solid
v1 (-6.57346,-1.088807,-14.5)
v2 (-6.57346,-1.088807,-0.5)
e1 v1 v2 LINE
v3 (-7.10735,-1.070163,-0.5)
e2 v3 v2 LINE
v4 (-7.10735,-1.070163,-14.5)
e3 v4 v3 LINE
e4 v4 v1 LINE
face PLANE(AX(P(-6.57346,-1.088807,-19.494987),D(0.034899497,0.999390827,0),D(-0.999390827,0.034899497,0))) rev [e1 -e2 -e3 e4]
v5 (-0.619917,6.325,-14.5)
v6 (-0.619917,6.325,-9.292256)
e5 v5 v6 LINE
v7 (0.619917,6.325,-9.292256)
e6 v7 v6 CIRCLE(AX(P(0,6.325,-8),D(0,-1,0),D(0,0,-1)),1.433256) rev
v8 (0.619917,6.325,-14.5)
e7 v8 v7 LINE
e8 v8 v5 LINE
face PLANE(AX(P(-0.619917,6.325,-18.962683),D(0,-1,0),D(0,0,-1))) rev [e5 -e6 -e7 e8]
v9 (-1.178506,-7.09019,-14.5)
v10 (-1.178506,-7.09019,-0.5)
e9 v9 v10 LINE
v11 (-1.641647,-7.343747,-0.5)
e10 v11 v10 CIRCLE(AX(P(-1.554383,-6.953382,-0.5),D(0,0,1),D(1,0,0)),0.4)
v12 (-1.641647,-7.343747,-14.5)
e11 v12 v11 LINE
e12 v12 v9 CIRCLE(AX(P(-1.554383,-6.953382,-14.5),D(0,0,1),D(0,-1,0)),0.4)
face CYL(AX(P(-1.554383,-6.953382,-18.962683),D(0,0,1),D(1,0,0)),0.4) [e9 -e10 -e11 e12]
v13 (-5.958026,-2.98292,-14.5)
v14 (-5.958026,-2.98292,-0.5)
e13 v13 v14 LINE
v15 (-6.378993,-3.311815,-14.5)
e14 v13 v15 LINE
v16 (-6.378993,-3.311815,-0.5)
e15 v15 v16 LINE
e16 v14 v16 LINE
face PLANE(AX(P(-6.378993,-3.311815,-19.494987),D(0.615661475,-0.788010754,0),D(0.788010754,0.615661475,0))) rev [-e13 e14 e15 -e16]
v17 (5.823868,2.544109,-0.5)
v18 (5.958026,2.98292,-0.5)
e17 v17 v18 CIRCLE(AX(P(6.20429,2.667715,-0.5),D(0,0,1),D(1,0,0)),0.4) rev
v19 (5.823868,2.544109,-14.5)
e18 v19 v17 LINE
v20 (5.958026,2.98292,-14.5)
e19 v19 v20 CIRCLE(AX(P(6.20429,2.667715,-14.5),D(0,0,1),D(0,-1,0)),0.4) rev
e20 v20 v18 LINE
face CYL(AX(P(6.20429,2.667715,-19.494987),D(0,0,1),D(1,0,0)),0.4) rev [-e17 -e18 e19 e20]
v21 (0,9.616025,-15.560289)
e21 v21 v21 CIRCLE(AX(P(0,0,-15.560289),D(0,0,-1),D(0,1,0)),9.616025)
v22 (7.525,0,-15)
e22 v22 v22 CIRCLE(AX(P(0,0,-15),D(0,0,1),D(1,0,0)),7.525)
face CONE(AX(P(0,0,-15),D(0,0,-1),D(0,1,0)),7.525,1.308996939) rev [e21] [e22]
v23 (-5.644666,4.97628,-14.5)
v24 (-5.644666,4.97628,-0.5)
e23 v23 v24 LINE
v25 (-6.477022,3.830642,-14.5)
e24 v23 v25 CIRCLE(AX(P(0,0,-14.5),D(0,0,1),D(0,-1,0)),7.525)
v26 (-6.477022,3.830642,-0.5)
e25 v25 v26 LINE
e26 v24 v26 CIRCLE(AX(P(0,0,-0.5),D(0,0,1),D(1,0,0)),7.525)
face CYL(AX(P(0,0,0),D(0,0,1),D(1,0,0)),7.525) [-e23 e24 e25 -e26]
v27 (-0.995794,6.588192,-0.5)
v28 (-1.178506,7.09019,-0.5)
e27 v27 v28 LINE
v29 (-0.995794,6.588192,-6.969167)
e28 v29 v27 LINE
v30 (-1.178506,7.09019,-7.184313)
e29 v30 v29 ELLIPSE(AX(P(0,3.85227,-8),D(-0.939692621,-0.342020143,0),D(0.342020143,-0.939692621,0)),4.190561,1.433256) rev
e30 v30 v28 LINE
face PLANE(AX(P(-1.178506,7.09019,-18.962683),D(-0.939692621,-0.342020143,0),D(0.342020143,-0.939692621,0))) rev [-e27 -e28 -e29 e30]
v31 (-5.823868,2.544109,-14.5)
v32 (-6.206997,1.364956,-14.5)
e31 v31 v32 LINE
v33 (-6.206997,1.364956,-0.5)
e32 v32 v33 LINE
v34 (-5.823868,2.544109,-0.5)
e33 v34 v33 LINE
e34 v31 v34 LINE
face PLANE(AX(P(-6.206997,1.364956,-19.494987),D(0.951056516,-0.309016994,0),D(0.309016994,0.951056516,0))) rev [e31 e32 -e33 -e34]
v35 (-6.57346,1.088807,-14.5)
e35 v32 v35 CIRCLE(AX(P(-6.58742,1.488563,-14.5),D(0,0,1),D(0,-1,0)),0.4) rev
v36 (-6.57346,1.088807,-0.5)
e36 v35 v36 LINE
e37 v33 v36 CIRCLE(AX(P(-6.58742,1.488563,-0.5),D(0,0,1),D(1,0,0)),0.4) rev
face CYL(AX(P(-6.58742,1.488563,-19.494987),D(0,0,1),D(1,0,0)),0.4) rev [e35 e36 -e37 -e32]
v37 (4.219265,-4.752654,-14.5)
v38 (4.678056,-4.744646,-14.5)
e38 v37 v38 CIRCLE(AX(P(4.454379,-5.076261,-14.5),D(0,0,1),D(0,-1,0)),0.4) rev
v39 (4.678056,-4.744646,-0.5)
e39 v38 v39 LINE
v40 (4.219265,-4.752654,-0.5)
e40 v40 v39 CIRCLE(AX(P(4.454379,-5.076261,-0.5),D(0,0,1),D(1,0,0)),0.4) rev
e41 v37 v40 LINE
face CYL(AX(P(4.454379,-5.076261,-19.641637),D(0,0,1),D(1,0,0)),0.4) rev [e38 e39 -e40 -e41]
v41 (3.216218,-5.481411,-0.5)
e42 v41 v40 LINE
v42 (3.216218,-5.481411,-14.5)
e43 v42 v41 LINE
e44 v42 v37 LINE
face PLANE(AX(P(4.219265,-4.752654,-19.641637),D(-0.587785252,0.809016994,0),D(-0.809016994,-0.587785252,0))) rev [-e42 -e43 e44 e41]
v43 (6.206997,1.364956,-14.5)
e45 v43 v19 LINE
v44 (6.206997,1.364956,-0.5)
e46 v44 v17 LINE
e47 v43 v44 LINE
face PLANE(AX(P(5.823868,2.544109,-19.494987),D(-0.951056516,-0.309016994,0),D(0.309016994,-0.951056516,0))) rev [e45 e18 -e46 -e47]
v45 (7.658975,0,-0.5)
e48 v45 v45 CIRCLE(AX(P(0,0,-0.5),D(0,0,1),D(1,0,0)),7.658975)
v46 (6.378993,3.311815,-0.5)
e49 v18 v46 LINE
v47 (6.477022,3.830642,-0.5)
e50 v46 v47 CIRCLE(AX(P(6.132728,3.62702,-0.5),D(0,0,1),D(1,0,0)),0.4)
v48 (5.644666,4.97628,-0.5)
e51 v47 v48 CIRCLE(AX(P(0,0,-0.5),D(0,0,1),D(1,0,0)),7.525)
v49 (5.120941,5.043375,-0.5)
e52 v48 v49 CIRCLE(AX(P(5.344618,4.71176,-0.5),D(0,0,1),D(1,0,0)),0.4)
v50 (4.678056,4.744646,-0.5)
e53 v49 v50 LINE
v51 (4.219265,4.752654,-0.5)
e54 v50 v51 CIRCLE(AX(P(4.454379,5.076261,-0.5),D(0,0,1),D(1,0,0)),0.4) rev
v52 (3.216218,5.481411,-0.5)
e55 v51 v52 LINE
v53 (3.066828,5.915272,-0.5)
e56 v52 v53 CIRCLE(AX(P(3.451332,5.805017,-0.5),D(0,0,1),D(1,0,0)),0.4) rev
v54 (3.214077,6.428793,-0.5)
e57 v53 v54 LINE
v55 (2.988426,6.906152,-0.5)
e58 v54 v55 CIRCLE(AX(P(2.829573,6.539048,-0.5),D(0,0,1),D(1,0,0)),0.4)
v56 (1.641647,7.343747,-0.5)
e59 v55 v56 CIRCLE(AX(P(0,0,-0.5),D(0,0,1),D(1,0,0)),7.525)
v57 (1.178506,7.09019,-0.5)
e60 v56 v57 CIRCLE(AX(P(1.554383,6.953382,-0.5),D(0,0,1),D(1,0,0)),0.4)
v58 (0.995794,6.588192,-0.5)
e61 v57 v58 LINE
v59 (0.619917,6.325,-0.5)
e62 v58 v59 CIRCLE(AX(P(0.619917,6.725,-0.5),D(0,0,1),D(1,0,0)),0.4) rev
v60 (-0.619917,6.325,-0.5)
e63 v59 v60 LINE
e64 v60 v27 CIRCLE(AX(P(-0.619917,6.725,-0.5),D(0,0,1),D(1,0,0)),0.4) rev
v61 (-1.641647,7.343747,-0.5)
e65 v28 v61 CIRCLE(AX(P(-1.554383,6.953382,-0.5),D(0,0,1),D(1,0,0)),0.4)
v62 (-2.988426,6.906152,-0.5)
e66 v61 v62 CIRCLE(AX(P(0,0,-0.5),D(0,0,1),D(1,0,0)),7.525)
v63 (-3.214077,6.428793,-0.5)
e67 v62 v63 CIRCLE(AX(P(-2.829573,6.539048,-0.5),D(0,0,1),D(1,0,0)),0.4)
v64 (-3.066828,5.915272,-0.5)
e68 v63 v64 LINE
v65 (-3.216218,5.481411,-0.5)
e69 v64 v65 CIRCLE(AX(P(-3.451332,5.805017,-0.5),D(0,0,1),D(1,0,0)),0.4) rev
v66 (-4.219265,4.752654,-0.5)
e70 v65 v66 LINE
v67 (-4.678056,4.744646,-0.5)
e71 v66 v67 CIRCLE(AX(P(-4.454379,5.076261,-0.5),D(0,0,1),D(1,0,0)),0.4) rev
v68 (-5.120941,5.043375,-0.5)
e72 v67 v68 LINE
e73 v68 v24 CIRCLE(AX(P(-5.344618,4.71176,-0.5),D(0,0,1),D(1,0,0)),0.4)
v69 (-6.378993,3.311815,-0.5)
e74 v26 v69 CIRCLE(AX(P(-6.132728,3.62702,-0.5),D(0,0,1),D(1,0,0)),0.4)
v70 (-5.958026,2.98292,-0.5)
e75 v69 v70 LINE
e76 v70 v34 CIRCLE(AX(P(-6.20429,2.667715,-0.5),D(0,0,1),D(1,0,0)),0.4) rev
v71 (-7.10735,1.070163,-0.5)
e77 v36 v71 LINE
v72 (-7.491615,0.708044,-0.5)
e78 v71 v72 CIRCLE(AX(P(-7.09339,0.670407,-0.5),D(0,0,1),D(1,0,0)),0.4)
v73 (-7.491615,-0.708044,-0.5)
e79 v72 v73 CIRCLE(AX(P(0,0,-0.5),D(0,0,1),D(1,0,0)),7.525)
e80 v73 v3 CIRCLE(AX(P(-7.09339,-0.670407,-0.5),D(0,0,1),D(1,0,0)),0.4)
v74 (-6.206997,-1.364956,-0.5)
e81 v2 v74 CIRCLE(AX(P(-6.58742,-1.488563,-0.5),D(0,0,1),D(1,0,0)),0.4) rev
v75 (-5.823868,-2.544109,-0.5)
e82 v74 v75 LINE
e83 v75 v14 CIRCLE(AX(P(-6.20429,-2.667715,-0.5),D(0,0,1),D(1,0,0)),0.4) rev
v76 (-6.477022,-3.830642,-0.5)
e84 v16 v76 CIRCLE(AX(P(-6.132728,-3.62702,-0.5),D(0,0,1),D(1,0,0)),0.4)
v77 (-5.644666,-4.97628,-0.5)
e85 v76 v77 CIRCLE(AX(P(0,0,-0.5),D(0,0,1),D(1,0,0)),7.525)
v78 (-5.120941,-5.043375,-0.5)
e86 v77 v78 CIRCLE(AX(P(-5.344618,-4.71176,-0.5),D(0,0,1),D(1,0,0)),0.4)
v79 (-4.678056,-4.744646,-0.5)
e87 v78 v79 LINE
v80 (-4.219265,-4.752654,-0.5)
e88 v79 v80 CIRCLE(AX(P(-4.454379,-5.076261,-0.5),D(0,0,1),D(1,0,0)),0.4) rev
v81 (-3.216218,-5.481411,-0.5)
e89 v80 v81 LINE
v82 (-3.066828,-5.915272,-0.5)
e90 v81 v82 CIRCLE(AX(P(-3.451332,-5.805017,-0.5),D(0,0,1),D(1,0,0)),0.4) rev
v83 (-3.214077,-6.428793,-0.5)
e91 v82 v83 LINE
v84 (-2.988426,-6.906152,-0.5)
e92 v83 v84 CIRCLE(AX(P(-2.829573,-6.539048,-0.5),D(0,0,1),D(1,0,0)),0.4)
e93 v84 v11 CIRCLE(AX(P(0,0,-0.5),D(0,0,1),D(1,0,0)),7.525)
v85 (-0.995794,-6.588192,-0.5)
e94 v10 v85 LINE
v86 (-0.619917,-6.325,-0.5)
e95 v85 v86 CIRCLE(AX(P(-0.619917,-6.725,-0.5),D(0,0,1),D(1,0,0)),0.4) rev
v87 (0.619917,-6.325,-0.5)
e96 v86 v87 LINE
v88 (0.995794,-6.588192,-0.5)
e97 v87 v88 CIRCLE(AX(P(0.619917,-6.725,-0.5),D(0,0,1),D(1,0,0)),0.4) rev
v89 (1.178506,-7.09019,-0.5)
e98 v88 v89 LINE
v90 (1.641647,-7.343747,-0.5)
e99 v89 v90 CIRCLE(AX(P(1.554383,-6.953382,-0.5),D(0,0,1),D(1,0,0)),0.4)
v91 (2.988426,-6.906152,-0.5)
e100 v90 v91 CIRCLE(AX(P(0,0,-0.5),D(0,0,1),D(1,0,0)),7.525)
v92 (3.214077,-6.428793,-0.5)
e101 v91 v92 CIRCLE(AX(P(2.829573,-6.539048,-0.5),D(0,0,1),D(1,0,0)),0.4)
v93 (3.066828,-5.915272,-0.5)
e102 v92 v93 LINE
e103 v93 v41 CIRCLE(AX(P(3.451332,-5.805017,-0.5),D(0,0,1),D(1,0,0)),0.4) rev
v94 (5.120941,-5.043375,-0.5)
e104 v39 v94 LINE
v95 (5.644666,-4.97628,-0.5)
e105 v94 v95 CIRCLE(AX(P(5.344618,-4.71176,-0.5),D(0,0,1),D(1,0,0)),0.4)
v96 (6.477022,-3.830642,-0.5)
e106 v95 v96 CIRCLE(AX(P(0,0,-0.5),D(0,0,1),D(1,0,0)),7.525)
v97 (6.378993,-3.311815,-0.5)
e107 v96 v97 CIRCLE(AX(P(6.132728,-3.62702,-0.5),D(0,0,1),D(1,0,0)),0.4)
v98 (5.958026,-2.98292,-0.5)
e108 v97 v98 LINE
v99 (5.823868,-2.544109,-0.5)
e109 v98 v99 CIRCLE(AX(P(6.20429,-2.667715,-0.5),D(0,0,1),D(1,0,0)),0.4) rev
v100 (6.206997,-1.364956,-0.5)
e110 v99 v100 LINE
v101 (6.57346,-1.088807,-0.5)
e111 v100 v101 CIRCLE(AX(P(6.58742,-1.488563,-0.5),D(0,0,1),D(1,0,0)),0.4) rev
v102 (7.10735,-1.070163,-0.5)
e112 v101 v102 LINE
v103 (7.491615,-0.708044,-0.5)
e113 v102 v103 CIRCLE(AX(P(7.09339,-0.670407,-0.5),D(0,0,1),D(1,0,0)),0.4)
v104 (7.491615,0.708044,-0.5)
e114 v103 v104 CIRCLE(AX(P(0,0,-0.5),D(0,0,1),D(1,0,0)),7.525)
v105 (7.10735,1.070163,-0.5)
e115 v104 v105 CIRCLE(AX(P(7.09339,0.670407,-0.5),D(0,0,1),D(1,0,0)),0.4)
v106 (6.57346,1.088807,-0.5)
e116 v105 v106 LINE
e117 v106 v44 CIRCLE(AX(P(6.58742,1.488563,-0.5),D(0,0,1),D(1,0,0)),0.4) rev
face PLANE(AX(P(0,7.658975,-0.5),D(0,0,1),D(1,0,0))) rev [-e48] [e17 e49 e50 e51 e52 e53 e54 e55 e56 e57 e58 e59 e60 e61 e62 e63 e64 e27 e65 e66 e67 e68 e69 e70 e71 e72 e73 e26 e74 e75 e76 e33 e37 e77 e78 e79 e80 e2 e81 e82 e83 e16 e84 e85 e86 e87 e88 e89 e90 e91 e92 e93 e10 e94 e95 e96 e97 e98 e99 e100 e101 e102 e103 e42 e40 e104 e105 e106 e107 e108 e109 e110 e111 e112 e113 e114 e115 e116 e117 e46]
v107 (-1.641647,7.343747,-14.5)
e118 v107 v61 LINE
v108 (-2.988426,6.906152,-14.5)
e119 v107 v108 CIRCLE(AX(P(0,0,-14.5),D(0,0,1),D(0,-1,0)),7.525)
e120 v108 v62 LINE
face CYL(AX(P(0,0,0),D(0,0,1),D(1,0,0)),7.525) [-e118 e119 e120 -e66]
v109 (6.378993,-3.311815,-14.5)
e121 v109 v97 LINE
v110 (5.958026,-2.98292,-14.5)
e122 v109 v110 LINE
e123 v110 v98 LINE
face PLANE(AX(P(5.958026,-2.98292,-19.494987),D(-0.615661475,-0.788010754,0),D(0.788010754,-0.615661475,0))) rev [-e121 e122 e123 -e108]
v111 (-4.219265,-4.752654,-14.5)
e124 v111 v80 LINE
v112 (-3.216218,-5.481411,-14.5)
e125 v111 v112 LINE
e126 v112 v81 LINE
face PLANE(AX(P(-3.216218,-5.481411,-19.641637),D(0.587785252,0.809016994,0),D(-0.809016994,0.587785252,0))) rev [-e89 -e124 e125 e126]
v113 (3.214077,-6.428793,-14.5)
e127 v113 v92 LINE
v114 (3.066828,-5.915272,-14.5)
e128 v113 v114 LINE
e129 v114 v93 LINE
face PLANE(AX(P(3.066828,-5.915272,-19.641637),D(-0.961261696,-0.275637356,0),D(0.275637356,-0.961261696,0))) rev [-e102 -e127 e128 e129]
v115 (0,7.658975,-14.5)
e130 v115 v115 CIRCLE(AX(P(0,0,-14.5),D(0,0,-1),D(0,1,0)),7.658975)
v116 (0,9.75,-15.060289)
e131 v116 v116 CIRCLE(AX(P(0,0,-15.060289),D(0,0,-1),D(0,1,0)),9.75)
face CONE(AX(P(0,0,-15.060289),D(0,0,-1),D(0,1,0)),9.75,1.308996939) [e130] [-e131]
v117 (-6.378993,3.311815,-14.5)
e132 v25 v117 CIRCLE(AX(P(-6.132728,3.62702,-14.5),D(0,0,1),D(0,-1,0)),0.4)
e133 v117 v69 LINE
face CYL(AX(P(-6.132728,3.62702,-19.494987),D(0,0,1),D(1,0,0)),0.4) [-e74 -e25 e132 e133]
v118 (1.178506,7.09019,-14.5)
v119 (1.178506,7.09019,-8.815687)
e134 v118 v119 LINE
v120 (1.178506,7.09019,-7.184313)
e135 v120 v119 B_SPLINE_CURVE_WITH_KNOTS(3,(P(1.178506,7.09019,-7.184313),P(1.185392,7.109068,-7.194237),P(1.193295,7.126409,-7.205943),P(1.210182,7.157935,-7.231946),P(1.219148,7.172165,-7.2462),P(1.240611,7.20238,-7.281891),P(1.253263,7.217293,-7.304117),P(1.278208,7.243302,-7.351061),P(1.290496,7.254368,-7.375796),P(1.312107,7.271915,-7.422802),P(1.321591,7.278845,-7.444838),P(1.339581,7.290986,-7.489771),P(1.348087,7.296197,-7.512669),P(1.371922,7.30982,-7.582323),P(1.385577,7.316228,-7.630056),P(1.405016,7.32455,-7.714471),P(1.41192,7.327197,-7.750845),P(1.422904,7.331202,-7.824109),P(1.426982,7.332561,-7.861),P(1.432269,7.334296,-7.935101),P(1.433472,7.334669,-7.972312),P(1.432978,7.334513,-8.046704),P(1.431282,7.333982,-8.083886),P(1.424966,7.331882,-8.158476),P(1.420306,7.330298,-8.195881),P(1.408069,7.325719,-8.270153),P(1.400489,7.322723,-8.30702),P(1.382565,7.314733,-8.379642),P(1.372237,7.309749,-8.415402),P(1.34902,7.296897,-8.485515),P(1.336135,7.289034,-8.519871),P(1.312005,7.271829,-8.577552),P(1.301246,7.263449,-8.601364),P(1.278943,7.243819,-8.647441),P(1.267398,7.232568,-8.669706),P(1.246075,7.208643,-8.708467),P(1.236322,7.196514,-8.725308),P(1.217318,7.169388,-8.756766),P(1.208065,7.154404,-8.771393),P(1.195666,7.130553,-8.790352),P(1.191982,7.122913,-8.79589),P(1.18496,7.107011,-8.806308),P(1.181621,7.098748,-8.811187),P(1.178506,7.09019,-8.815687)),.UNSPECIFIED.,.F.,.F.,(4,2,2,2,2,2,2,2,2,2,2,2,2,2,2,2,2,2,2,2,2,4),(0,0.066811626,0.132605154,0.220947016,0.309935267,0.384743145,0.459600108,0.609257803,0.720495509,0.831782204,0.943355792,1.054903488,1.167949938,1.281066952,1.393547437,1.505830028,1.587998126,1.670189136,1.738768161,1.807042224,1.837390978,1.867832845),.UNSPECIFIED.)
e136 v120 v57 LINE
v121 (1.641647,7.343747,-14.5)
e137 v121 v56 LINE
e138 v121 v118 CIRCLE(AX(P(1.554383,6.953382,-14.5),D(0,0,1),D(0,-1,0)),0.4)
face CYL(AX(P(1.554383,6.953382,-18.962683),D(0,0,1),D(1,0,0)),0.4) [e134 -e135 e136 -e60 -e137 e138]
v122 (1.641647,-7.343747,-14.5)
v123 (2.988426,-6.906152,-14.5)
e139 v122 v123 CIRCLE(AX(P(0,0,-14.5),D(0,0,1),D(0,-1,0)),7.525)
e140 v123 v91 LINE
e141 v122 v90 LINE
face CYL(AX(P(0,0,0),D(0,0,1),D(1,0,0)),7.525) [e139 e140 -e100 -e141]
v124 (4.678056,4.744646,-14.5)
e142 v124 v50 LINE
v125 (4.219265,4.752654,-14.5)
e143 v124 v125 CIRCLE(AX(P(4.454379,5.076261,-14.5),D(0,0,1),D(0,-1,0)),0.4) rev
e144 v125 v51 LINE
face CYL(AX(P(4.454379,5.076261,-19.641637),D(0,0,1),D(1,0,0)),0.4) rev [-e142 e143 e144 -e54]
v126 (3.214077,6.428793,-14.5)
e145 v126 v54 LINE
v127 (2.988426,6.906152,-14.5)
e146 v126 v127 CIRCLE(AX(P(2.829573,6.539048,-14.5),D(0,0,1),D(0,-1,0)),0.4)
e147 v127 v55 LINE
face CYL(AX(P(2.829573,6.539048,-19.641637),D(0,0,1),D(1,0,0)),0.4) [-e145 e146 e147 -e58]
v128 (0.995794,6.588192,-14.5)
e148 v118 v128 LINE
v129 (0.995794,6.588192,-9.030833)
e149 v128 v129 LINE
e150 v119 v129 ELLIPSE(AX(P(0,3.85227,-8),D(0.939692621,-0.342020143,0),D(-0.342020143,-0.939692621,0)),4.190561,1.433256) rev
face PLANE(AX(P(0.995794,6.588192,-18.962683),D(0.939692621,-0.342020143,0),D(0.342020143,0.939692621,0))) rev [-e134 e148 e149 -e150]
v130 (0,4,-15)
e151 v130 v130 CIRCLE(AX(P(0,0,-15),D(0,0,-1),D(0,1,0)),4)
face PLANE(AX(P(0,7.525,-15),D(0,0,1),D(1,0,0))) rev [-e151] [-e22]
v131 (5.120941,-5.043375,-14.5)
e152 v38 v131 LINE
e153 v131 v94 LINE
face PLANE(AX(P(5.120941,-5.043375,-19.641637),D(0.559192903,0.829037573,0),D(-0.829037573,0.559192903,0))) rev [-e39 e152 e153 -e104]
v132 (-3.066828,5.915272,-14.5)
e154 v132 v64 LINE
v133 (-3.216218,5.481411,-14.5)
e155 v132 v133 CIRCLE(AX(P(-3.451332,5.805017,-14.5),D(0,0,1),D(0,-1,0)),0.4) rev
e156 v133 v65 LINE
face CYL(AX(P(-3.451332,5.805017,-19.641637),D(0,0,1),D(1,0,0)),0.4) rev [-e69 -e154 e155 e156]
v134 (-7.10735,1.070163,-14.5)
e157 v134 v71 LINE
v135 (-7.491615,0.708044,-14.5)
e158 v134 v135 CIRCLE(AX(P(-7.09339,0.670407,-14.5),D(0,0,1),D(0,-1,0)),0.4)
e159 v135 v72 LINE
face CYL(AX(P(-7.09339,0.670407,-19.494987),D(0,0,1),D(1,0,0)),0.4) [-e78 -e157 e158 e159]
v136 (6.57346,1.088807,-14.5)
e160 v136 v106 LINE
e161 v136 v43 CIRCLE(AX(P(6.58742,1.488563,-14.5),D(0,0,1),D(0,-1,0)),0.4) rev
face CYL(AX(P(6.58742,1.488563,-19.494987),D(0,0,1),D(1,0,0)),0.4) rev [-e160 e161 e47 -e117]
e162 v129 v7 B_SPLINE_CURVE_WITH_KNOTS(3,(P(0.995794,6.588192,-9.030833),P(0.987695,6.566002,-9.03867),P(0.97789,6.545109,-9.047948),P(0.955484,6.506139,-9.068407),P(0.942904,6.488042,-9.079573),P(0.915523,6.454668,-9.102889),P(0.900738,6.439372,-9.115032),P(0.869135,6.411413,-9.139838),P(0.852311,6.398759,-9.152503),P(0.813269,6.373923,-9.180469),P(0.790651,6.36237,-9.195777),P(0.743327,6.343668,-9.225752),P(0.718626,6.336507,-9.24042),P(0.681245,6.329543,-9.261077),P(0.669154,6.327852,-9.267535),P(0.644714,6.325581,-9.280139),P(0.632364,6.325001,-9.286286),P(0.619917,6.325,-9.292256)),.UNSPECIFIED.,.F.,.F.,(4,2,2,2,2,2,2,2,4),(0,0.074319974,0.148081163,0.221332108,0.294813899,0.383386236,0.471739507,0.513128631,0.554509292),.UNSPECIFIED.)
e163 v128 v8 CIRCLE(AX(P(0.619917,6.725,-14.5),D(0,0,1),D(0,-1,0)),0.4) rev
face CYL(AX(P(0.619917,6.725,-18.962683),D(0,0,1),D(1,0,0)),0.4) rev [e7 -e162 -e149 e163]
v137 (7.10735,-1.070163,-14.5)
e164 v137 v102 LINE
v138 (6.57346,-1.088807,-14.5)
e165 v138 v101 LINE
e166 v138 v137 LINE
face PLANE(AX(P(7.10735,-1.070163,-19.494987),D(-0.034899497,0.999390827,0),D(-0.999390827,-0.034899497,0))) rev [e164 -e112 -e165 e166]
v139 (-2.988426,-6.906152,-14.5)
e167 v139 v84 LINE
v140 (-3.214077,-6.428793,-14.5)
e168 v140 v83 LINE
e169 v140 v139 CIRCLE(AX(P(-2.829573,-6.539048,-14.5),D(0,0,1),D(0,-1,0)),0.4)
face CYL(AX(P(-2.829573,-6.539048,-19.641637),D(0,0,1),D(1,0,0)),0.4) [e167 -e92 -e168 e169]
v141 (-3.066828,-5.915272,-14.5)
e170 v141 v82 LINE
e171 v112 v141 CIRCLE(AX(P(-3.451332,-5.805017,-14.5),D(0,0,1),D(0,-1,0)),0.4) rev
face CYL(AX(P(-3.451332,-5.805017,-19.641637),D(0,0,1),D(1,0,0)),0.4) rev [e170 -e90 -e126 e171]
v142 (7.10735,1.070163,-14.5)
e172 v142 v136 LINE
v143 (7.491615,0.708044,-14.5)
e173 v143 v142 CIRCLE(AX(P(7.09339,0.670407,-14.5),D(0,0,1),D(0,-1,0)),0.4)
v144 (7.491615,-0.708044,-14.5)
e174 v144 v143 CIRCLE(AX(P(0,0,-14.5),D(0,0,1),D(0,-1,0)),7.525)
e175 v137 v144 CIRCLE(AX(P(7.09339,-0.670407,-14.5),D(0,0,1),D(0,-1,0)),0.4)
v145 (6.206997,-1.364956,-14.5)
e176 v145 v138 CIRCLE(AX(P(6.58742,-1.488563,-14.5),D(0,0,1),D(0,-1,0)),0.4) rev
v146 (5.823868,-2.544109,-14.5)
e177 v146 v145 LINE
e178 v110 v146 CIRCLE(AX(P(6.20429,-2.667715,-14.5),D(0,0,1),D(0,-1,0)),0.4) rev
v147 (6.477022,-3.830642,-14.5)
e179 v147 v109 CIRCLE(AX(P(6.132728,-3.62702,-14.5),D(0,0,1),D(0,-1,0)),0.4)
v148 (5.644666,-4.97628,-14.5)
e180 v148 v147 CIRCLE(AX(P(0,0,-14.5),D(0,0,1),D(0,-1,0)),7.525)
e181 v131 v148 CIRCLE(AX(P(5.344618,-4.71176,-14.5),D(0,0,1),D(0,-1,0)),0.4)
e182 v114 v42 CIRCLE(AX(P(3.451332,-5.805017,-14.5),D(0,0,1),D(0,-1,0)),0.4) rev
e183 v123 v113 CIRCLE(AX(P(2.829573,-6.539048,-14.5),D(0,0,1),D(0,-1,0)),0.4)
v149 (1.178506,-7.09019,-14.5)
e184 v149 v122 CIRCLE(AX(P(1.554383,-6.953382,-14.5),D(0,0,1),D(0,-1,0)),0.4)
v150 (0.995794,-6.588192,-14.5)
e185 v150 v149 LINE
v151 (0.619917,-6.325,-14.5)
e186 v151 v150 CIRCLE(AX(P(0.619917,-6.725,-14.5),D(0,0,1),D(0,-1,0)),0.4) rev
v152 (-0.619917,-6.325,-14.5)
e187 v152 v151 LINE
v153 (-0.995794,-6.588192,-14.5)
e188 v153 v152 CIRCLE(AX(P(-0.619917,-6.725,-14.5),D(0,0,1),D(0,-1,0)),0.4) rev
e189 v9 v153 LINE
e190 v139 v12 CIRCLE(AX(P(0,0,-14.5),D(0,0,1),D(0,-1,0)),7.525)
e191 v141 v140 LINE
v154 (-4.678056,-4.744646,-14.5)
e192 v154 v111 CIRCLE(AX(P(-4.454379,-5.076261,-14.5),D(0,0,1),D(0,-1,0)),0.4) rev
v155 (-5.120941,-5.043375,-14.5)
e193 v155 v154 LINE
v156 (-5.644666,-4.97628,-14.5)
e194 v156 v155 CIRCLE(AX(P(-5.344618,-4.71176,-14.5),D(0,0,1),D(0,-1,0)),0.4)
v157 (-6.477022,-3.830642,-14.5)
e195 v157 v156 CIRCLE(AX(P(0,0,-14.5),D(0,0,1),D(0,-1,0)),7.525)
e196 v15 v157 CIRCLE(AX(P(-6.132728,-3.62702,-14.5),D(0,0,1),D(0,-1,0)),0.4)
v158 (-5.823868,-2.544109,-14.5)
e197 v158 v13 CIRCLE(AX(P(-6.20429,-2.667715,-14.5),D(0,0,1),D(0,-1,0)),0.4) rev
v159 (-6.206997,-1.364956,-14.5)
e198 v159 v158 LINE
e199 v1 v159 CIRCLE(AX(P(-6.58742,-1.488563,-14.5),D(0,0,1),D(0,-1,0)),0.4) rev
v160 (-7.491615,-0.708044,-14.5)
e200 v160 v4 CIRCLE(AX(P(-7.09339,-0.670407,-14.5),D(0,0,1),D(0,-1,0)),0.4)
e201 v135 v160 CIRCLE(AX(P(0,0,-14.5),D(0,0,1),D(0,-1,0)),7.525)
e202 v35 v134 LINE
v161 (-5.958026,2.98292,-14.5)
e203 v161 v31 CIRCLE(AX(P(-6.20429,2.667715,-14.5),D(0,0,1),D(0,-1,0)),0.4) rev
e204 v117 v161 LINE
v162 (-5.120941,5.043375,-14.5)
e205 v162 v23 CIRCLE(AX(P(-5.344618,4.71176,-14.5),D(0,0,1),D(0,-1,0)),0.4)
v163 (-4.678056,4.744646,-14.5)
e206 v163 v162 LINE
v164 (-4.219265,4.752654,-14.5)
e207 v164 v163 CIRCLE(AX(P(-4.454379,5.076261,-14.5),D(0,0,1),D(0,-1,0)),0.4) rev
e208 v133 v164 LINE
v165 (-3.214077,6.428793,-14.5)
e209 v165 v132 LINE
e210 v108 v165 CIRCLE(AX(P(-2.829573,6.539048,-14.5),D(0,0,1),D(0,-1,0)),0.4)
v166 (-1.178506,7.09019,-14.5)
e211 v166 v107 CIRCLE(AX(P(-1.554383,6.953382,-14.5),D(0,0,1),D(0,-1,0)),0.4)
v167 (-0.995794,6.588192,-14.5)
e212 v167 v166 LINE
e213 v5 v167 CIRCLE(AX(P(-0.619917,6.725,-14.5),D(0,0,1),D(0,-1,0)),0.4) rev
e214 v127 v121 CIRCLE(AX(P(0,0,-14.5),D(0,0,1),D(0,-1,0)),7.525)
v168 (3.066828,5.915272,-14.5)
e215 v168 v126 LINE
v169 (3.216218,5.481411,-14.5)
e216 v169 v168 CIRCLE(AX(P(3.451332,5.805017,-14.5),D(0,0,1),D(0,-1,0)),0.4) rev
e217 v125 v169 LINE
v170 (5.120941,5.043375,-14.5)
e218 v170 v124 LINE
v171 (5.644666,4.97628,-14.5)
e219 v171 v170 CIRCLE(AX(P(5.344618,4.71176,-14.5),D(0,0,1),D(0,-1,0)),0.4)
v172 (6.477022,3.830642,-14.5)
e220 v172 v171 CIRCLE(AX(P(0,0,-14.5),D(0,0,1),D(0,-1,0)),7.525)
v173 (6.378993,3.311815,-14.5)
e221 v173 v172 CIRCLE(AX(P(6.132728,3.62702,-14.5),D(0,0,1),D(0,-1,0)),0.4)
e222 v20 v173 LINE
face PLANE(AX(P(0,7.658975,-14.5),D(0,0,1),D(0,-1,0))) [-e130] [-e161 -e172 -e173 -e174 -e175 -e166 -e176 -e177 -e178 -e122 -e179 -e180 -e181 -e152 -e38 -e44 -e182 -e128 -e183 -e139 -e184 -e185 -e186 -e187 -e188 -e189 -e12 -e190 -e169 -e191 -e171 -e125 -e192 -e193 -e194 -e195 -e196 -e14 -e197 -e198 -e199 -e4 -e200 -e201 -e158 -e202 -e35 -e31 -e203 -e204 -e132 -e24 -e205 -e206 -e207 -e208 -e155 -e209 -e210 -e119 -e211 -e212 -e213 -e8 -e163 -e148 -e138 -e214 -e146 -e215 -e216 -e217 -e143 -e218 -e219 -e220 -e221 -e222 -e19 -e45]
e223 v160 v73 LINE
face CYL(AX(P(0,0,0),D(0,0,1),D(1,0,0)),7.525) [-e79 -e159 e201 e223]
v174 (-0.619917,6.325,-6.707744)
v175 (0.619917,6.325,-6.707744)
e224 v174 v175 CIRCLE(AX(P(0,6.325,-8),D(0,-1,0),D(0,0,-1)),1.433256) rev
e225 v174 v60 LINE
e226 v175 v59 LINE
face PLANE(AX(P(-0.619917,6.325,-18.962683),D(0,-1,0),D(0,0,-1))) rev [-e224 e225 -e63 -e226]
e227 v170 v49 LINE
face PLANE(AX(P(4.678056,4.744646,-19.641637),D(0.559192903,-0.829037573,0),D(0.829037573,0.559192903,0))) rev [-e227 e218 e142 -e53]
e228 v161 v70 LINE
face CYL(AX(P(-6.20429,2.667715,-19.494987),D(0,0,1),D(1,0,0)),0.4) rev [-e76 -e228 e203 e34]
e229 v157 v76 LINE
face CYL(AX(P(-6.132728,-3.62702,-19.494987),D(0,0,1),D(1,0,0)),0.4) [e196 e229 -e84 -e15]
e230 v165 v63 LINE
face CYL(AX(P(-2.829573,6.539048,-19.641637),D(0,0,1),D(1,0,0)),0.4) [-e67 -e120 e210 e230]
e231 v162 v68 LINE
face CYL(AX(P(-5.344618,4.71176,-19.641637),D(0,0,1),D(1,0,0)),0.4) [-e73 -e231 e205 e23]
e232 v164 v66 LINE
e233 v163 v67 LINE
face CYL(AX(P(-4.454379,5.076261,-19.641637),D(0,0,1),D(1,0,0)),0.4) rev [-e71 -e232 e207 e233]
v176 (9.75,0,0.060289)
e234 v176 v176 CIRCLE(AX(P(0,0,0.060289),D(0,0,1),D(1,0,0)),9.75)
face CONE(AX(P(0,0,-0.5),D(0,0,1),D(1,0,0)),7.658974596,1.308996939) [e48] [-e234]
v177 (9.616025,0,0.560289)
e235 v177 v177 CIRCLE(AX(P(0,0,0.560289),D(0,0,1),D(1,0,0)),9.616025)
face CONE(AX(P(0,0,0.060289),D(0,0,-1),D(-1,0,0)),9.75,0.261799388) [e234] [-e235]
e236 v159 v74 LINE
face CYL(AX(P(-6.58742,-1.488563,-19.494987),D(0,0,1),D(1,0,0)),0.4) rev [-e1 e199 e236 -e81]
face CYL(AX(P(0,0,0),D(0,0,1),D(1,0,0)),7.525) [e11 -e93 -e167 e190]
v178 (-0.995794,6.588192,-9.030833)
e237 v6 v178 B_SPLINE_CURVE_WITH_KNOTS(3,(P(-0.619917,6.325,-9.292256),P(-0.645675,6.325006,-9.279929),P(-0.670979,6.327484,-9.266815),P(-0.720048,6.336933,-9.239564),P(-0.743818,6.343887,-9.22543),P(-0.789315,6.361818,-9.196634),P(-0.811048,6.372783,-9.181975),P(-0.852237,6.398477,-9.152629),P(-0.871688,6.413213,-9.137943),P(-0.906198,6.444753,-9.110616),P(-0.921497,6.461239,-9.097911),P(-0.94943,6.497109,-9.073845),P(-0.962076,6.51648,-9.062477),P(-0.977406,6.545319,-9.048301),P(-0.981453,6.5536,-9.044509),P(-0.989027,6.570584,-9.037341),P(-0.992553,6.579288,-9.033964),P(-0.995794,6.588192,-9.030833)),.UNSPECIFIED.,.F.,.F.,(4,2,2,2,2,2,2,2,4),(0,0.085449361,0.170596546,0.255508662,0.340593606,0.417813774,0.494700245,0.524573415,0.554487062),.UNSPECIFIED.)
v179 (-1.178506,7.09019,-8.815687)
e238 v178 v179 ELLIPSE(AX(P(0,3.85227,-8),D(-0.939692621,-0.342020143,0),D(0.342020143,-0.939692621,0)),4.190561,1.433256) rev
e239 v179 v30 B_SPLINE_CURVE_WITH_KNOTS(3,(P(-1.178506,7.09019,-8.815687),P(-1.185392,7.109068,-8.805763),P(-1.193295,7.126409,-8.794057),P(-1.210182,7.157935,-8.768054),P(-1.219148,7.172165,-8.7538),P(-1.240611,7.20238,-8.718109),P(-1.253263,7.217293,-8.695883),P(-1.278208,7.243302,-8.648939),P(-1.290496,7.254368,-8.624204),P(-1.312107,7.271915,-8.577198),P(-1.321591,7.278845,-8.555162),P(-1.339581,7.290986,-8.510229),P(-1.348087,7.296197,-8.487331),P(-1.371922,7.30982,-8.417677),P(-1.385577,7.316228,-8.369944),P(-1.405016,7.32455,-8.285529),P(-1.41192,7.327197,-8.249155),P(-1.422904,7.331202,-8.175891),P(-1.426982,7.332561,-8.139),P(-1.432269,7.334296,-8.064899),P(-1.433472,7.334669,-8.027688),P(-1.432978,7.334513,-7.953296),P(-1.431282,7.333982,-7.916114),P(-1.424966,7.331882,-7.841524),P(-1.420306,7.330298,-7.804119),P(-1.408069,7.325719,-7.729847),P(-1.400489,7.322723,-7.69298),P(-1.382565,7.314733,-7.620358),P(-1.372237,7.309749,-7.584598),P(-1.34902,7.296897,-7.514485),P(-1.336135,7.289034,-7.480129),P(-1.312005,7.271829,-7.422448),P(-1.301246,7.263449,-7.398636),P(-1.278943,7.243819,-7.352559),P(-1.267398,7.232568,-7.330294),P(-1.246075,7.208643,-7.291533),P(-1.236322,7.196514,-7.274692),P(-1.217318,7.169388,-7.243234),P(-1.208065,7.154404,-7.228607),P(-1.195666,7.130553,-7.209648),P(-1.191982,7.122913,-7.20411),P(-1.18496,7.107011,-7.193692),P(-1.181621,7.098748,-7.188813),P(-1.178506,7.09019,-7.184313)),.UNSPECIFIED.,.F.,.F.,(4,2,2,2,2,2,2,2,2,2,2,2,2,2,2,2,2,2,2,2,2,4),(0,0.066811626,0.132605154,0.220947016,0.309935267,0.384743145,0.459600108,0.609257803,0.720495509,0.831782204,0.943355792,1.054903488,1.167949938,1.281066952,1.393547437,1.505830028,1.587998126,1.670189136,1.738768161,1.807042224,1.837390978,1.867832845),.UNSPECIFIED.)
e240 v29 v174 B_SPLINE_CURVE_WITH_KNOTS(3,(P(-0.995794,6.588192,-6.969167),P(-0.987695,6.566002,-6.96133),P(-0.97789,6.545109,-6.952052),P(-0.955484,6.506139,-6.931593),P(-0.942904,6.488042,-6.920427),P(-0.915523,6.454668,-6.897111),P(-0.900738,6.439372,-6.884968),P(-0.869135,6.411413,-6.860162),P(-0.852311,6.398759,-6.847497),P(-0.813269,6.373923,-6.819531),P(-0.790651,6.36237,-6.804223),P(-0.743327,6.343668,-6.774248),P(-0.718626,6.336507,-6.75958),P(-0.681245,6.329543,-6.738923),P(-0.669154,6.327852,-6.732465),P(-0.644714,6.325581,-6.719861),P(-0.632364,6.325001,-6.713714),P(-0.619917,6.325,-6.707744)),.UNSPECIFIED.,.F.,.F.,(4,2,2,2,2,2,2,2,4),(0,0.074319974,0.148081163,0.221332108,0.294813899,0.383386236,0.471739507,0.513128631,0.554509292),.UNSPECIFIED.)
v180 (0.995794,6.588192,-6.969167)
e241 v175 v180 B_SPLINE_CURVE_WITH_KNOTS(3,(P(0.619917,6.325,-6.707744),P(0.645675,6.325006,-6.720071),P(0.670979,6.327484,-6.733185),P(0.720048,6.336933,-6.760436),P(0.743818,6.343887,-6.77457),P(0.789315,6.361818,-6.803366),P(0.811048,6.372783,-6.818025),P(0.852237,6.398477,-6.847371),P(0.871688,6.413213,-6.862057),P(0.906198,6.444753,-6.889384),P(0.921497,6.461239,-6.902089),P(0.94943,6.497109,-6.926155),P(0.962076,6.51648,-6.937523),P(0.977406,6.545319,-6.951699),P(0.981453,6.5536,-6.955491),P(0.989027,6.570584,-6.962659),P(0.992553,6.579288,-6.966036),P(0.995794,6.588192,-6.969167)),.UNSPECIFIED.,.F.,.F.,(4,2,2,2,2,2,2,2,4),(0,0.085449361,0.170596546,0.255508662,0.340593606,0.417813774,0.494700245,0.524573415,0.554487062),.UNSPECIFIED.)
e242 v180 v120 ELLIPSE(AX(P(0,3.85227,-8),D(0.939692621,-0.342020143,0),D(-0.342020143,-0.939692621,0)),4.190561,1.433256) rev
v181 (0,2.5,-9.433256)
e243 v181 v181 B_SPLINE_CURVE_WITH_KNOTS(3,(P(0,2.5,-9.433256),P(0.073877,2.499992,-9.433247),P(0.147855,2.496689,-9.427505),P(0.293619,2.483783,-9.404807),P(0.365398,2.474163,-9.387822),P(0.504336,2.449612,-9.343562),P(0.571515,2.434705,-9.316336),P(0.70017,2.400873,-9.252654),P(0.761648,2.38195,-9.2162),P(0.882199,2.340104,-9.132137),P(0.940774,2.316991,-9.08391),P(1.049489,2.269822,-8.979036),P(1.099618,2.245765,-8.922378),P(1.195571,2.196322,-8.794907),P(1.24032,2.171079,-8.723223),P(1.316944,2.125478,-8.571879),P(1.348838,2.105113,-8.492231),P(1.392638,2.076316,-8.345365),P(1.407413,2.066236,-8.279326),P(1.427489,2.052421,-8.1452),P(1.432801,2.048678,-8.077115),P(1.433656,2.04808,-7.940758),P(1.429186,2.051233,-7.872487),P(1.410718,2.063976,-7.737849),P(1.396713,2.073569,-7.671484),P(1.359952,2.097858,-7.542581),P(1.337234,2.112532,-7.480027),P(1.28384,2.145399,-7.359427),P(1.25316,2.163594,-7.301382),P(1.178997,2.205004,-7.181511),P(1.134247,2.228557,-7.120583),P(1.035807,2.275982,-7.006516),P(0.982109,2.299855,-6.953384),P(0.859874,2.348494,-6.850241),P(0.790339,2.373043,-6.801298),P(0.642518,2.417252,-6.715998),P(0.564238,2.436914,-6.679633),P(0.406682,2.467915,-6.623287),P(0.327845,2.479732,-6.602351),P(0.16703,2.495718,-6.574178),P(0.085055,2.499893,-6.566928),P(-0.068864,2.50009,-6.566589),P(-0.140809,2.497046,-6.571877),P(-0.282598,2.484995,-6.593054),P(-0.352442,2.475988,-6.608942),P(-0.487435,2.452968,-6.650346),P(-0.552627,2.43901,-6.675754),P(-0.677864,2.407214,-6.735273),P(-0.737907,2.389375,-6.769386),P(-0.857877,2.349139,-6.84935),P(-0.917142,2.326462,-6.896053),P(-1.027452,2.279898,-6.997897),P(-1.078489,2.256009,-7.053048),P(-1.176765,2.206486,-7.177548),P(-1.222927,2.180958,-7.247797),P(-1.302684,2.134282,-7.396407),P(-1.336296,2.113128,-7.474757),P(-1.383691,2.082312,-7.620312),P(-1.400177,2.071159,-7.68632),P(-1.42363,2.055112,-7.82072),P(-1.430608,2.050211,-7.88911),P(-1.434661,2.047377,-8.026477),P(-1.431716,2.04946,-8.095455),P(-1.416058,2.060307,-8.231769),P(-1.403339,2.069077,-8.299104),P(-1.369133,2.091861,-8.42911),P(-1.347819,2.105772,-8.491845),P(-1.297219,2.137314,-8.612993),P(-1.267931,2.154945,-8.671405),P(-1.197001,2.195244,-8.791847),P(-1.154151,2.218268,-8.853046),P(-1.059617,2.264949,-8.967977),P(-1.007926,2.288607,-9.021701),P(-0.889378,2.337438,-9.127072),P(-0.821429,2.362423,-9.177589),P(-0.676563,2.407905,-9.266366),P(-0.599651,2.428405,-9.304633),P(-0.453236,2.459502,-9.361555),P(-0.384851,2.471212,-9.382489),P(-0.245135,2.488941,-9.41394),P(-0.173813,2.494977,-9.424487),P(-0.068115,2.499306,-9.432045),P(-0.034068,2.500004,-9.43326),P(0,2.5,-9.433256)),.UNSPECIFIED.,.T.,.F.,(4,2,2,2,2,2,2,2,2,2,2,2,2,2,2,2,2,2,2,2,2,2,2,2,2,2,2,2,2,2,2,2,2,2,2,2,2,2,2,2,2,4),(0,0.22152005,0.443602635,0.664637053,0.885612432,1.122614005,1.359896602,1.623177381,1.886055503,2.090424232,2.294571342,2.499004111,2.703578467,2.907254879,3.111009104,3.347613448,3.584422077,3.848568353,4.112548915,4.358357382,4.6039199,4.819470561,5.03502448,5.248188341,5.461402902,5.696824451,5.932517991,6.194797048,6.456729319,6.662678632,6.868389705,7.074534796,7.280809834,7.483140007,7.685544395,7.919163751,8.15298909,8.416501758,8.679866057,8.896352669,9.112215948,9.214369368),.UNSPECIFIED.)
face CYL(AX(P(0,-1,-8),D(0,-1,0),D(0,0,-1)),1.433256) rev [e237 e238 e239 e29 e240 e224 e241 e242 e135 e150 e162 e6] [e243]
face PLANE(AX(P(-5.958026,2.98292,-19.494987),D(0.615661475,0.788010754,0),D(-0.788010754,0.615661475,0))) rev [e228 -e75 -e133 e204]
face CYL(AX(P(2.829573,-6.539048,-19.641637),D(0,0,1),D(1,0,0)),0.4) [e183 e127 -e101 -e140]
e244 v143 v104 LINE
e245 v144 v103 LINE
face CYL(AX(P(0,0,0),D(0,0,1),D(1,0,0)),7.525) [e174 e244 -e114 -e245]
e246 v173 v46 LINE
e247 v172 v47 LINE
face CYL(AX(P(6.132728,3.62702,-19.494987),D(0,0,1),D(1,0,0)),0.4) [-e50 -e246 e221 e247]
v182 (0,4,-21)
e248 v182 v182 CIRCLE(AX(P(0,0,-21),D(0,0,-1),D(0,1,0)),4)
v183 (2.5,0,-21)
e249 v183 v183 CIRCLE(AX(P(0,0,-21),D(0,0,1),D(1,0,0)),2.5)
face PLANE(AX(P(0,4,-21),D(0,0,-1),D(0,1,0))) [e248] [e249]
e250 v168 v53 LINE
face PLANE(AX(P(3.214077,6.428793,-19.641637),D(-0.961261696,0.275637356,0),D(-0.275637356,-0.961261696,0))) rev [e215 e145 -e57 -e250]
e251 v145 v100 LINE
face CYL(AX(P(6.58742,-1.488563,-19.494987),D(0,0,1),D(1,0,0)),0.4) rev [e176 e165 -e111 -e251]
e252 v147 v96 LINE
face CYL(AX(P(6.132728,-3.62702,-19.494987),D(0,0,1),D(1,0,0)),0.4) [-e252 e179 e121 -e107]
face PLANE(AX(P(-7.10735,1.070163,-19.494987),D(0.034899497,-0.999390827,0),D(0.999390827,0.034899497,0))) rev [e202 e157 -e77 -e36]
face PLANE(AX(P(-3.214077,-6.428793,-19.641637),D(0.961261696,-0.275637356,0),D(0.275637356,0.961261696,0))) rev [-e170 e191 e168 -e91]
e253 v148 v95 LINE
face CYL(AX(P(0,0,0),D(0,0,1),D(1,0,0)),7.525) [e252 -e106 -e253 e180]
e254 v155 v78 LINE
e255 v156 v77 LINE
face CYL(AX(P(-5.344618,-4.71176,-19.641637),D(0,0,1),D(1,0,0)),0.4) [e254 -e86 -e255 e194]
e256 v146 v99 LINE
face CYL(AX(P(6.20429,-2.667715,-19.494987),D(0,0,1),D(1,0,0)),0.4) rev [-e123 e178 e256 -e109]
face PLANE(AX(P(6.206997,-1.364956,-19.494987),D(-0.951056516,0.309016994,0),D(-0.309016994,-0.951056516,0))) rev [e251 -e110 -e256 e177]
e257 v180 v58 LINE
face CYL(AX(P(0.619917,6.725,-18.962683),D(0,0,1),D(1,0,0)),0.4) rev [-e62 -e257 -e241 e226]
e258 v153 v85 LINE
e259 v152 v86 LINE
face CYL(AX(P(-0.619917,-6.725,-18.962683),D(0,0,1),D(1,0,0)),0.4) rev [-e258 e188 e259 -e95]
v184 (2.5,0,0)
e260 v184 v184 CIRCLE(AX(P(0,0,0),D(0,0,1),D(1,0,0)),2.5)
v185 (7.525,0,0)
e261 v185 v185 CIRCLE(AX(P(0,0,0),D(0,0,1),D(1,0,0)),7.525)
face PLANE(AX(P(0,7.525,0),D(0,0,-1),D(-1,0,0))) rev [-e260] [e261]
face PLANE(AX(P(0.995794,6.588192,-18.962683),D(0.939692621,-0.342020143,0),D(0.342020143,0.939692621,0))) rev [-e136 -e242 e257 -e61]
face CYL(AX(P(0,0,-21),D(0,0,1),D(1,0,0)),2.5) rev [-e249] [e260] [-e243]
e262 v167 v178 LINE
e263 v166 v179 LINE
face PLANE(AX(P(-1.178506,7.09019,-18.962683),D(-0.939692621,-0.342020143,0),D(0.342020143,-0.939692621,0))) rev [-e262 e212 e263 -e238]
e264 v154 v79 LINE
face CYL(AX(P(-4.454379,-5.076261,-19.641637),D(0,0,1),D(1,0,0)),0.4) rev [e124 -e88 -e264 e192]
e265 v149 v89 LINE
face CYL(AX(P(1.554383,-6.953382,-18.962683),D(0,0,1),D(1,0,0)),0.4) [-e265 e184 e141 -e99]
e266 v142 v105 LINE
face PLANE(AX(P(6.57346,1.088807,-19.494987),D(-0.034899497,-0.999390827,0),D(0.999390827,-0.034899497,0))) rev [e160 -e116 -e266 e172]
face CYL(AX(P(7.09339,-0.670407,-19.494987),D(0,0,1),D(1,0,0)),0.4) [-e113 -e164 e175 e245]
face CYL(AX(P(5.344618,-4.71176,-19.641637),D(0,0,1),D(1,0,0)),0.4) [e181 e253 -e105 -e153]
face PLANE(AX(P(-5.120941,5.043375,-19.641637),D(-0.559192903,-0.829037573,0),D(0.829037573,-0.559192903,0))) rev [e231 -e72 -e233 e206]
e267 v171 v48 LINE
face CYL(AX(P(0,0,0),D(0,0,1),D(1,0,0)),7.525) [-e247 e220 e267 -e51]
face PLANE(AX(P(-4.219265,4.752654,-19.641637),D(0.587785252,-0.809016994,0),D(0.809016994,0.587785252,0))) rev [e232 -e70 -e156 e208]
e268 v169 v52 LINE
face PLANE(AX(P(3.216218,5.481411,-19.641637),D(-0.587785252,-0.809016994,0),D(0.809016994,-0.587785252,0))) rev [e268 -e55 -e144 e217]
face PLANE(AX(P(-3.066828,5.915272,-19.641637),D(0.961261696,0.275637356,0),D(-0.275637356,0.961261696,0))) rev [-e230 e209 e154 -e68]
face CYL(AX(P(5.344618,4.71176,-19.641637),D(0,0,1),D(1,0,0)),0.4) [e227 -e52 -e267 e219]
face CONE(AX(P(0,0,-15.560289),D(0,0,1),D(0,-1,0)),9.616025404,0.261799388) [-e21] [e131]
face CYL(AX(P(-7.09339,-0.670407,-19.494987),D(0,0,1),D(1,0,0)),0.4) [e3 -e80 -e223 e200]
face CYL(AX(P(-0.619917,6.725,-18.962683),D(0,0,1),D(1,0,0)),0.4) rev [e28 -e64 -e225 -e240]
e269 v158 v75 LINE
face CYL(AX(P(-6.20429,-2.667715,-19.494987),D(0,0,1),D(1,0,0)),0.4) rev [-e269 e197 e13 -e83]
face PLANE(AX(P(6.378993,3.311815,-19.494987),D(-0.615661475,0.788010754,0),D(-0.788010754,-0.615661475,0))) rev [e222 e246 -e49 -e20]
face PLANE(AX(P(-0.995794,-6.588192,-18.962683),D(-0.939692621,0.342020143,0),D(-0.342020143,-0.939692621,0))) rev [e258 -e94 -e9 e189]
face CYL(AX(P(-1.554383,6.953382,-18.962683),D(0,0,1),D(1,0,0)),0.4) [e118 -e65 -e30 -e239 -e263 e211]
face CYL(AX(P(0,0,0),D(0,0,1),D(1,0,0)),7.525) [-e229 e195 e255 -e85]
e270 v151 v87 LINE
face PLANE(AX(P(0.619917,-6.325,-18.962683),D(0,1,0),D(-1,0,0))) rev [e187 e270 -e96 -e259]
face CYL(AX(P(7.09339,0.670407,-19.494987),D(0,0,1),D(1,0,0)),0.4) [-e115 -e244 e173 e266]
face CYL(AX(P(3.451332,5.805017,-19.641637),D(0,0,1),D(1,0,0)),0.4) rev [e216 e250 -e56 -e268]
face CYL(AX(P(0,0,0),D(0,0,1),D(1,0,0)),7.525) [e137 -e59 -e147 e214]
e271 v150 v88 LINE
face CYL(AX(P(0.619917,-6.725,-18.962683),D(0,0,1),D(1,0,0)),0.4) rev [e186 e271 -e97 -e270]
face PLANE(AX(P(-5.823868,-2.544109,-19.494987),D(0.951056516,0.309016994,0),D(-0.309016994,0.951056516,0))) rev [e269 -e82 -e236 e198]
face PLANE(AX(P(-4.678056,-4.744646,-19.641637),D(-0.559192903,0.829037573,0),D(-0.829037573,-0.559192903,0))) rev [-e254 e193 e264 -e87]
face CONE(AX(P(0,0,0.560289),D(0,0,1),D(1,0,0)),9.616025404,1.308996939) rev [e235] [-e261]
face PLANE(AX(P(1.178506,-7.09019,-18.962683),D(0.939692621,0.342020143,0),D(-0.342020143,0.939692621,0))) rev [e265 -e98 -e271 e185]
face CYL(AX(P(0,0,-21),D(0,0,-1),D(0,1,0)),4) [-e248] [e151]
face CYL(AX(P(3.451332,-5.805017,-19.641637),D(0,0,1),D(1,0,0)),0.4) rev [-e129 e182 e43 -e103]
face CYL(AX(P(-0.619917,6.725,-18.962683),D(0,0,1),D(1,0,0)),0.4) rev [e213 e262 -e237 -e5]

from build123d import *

# Parameters (mm, degrees)
SKETCH5_W                   = 15
SKETCH5_H                   = 7.525
CUT_EXTRUDE_START           = -15
CUT_EXTRUDE_1_OUTLINE_R     = 2.5
CUT_EXTRUDE_1_DEPTH         = 15
CUT_EXTRUDE_START_2         = -21
CUT_EXTRUDE_1_2_OUTLINE_R   = 4
CUT_EXTRUDE_1_2_OUTLINE_R_2 = 2.5
CUT_EXTRUDE_1_2_DEPTH       = 6
CUT_EXTRUDE_START_3         = -14.5
CUT_EXTRUDE_1_3_DEPTH       = 14
CUT_EXTRUDE_START_4         = 1
CUT_EXTRUDE_1_5_OUTLINE_R   = 1.433256124
CUT_EXTRUDE_1_5_DEPTH       = 6.353381724


with BuildPart() as part:
    # Sketch5 → body (revolve)
    with BuildSketch(Plane(origin=(0, 0, 0), x_dir=(0, 0, -1), z_dir=(1, 0, 0)), mode=Mode.PRIVATE) as body_sk:
        with Locations((7.5, 3.7625)):
            Rectangle(SKETCH5_W, SKETCH5_H)
    revolve(body_sk.sketch.rotate(Axis((0, 0, 0), (0, 0, 1)), 270), axis=Axis((0, 0, 0), (0, 0, 1)))

    # Вырез-Вытянуть1: read off the stored shape, not the designer's step
    # Вырез-Вытянуть1 outline → Вырез-Вытянуть1 (cut)
    with BuildSketch(Plane.XY.offset(CUT_EXTRUDE_START)):
        Circle(CUT_EXTRUDE_1_OUTLINE_R)
    extrude(amount=CUT_EXTRUDE_1_DEPTH, mode=Mode.SUBTRACT)

    # Cut-Extrude 1 2 outline → Cut-Extrude 1 2 (add)
    with BuildSketch(Plane.XY.offset(CUT_EXTRUDE_START_2)):
        Circle(CUT_EXTRUDE_1_2_OUTLINE_R)
        Circle(CUT_EXTRUDE_1_2_OUTLINE_R_2, mode=Mode.SUBTRACT)
    extrude(amount=CUT_EXTRUDE_1_2_DEPTH)

    # Cut-Extrude 1 3 outline → Cut-Extrude 1 3 (cut)
    with BuildSketch(Plane.XY.offset(CUT_EXTRUDE_START_3)):
        with BuildLine():
            ThreePointArc((1.178506304, 7.090189781), (1.362296798, 7.304241747), (1.641646979, 7.343747013))
            ThreePointArc((1.641646979, 7.343747013), (0, 7.525), (-1.641646979, 7.343747013))
            ThreePointArc((-1.641646979, 7.343747013), (-1.362296798, 7.304241747), (-1.178506304, 7.090189781))
            Line((-1.178506304, 7.090189781), (-0.995794033, 6.588191943))
            ThreePointArc((-0.995794033, 6.588191943), (-0.84934756, 6.397339182), (-0.619916985, 6.325))
            Line((-0.619916985, 6.325), (0.619916985, 6.325))
            ThreePointArc((0.619916985, 6.325), (0.84934756, 6.397339182), (0.995794033, 6.588191943))
            Line((0.995794033, 6.588191943), (1.178506304, 7.090189781))
        make_face()
        with BuildLine():
            ThreePointArc((5.644666496, 4.976280253), (4.423084023, 6.087852883), (2.988425886, 6.90615202))
            ThreePointArc((2.988425886, 6.90615202), (3.191204317, 6.709993671), (3.214077361, 6.428792651))
            Line((3.214077361, 6.428792651), (3.066827768, 5.915272291))
            ThreePointArc((3.066827768, 5.915272291), (3.073125016, 5.674790087), (3.216218345, 5.481410551))
            Line((3.216218345, 5.481410551), (4.219265096, 4.752654428))
            ThreePointArc((4.219265096, 4.752654428), (4.447398235, 4.676322148), (4.678056359, 4.744646197))
            Line((4.678056359, 4.744646197), (5.120940617, 5.043375401))
            ThreePointArc((5.120940617, 5.043375401), (5.395446839, 5.108517737), (5.644666496, 4.976280253))
        make_face()
        with BuildLine():
            ThreePointArc((-3.214077361, 6.428792651), (-3.191204317, 6.709993671), (-2.988425886, 6.90615202))
            ThreePointArc((-2.988425886, 6.90615202), (-4.423084023, 6.087852883), (-5.644666496, 4.976280253))
            ThreePointArc((-5.644666496, 4.976280253), (-5.395446839, 5.108517737), (-5.120940617, 5.043375401))
            Line((-5.120940617, 5.043375401), (-4.678056359, 4.744646197))
            ThreePointArc((-4.678056359, 4.744646197), (-4.447398235, 4.676322148), (-4.219265096, 4.752654428))
            Line((-4.219265096, 4.752654428), (-3.216218345, 5.481410551))
            ThreePointArc((-3.216218345, 5.481410551), (-3.073125016, 5.674790087), (-3.066827768, 5.915272291))
            Line((-3.066827768, 5.915272291), (-3.214077361, 6.428792651))
        make_face()
        with BuildLine():
            ThreePointArc((7.491615266, 0.708043573), (7.156700285, 2.325352883), (6.477021636, 3.830641686))
            ThreePointArc((6.477021636, 3.830641686), (6.525773848, 3.552756077), (6.378992717, 3.311815235))
            Line((6.378992717, 3.311815235), (5.958025599, 2.982919676))
            ThreePointArc((5.958025599, 2.982919676), (5.821768286, 2.784664057), (5.823867582, 2.544108577))
            Line((5.823867582, 2.544108577), (6.206997349, 1.364956402))
            ThreePointArc((6.206997349, 1.364956402), (6.346693946, 1.169108995), (6.573460157, 1.088806868))
            Line((6.573460157, 1.088806868), (7.107349669, 1.070163036))
            ThreePointArc((7.107349669, 1.070163036), (7.367719572, 0.961513584), (7.491615266, 0.708043573))
        make_face()
        with BuildLine():
            ThreePointArc((-6.378992717, 3.311815235), (-6.525773848, 3.552756077), (-6.477021636, 3.830641686))
            ThreePointArc((-6.477021636, 3.830641686), (-7.156700285, 2.325352883), (-7.491615266, 0.708043573))
            ThreePointArc((-7.491615266, 0.708043573), (-7.367719572, 0.961513584), (-7.107349669, 1.070163036))
            Line((-7.107349669, 1.070163036), (-6.573460157, 1.088806868))
            ThreePointArc((-6.573460157, 1.088806868), (-6.346693946, 1.169108995), (-6.206997349, 1.364956402))
            Line((-6.206997349, 1.364956402), (-5.823867582, 2.544108577))
            ThreePointArc((-5.823867582, 2.544108577), (-5.821768286, 2.784664057), (-5.958025599, 2.982919676))
            Line((-5.958025599, 2.982919676), (-6.378992717, 3.311815235))
        make_face()
        with BuildLine():
            ThreePointArc((6.477021636, -3.830641686), (7.156700285, -2.325352883), (7.491615266, -0.708043573))
            ThreePointArc((7.491615266, -0.708043573), (7.367719572, -0.961513584), (7.107349669, -1.070163036))
            Line((7.107349669, -1.070163036), (6.573460157, -1.088806868))
            ThreePointArc((6.573460157, -1.088806868), (6.346693946, -1.169108995), (6.206997349, -1.364956402))
            Line((6.206997349, -1.364956402), (5.823867582, -2.544108577))
            ThreePointArc((5.823867582, -2.544108577), (5.821768286, -2.784664057), (5.958025599, -2.982919676))
            Line((5.958025599, -2.982919676), (6.378992717, -3.311815235))
            ThreePointArc((6.378992717, -3.311815235), (6.525773848, -3.552756077), (6.477021636, -3.830641686))
        make_face()
        with BuildLine():
            ThreePointArc((-7.107349669, -1.070163036), (-7.367719572, -0.961513584), (-7.491615266, -0.708043573))
            ThreePointArc((-7.491615266, -0.708043573), (-7.156700285, -2.325352883), (-6.477021636, -3.830641686))
            ThreePointArc((-6.477021636, -3.830641686), (-6.525773848, -3.552756077), (-6.378992717, -3.311815235))
            Line((-6.378992717, -3.311815235), (-5.958025599, -2.982919676))
            ThreePointArc((-5.958025599, -2.982919676), (-5.821768286, -2.784664057), (-5.823867582, -2.544108577))
            Line((-5.823867582, -2.544108577), (-6.206997349, -1.364956402))
            ThreePointArc((-6.206997349, -1.364956402), (-6.346693946, -1.169108995), (-6.573460157, -1.088806868))
            Line((-6.573460157, -1.088806868), (-7.107349669, -1.070163036))
        make_face()
        with BuildLine():
            ThreePointArc((2.988425886, -6.90615202), (4.423084023, -6.087852883), (5.644666496, -4.976280253))
            ThreePointArc((5.644666496, -4.976280253), (5.395446839, -5.108517737), (5.120940617, -5.043375401))
            Line((5.120940617, -5.043375401), (4.678056359, -4.744646197))
            ThreePointArc((4.678056359, -4.744646197), (4.447398235, -4.676322148), (4.219265096, -4.752654428))
            Line((4.219265096, -4.752654428), (3.216218345, -5.481410551))
            ThreePointArc((3.216218345, -5.481410551), (3.073125016, -5.674790087), (3.066827768, -5.915272291))
            Line((3.066827768, -5.915272291), (3.214077361, -6.428792651))
            ThreePointArc((3.214077361, -6.428792651), (3.191204317, -6.709993671), (2.988425886, -6.90615202))
        make_face()
        with BuildLine():
            ThreePointArc((-5.120940617, -5.043375401), (-5.395446839, -5.108517737), (-5.644666496, -4.976280253))
            ThreePointArc((-5.644666496, -4.976280253), (-4.423084023, -6.087852883), (-2.988425886, -6.90615202))
            ThreePointArc((-2.988425886, -6.90615202), (-3.191204317, -6.709993671), (-3.214077361, -6.428792651))
            Line((-3.214077361, -6.428792651), (-3.066827768, -5.915272291))
            ThreePointArc((-3.066827768, -5.915272291), (-3.073125016, -5.674790087), (-3.216218345, -5.481410551))
            Line((-3.216218345, -5.481410551), (-4.219265096, -4.752654428))
            ThreePointArc((-4.219265096, -4.752654428), (-4.447398235, -4.676322148), (-4.678056359, -4.744646197))
            Line((-4.678056359, -4.744646197), (-5.120940617, -5.043375401))
        make_face()
        with BuildLine():
            ThreePointArc((-1.641646979, -7.343747013), (0, -7.525), (1.641646979, -7.343747013))
            ThreePointArc((1.641646979, -7.343747013), (1.362296798, -7.304241747), (1.178506304, -7.090189781))
            Line((1.178506304, -7.090189781), (0.995794033, -6.588191943))
            ThreePointArc((0.995794033, -6.588191943), (0.84934756, -6.397339182), (0.619916985, -6.325))
            Line((0.619916985, -6.325), (-0.619916985, -6.325))
            ThreePointArc((-0.619916985, -6.325), (-0.84934756, -6.397339182), (-0.995794033, -6.588191943))
            Line((-0.995794033, -6.588191943), (-1.178506304, -7.090189781))
            ThreePointArc((-1.178506304, -7.090189781), (-1.362296798, -7.304241747), (-1.641646979, -7.343747013))
        make_face()
    extrude(amount=CUT_EXTRUDE_1_3_DEPTH, mode=Mode.SUBTRACT)

    # Cut-Extrude 1 4 outline → Cut-Extrude 1 4 (revolve)
    with BuildSketch(Plane.XZ):
        Polygon((7.525, 0), (7.525, -0.5), (7.658974596, -0.5), (9.75, 0.060288568), (9.616025404, 0.560288568), align=None)
        Polygon((7.658974596, -14.5), (7.525, -14.5), (7.525, -15), (9.616025404, -15.560288568), (9.75, -15.060288568), align=None)
    revolve(axis=Axis((0, 0, 0), (0, 0, 1)))

    # Cut-Extrude 1 5 outline → Cut-Extrude 1 5 (cut)
    with BuildSketch(Plane(origin=(0, 0, 0), x_dir=(1, 0, 0), z_dir=(0, 1, 0)).offset(CUT_EXTRUDE_START_4)):
        with Locations((0, 8)):
            Circle(CUT_EXTRUDE_1_5_OUTLINE_R)
    extrude(amount=CUT_EXTRUDE_1_5_DEPTH, mode=Mode.SUBTRACT)


solid = part.part
